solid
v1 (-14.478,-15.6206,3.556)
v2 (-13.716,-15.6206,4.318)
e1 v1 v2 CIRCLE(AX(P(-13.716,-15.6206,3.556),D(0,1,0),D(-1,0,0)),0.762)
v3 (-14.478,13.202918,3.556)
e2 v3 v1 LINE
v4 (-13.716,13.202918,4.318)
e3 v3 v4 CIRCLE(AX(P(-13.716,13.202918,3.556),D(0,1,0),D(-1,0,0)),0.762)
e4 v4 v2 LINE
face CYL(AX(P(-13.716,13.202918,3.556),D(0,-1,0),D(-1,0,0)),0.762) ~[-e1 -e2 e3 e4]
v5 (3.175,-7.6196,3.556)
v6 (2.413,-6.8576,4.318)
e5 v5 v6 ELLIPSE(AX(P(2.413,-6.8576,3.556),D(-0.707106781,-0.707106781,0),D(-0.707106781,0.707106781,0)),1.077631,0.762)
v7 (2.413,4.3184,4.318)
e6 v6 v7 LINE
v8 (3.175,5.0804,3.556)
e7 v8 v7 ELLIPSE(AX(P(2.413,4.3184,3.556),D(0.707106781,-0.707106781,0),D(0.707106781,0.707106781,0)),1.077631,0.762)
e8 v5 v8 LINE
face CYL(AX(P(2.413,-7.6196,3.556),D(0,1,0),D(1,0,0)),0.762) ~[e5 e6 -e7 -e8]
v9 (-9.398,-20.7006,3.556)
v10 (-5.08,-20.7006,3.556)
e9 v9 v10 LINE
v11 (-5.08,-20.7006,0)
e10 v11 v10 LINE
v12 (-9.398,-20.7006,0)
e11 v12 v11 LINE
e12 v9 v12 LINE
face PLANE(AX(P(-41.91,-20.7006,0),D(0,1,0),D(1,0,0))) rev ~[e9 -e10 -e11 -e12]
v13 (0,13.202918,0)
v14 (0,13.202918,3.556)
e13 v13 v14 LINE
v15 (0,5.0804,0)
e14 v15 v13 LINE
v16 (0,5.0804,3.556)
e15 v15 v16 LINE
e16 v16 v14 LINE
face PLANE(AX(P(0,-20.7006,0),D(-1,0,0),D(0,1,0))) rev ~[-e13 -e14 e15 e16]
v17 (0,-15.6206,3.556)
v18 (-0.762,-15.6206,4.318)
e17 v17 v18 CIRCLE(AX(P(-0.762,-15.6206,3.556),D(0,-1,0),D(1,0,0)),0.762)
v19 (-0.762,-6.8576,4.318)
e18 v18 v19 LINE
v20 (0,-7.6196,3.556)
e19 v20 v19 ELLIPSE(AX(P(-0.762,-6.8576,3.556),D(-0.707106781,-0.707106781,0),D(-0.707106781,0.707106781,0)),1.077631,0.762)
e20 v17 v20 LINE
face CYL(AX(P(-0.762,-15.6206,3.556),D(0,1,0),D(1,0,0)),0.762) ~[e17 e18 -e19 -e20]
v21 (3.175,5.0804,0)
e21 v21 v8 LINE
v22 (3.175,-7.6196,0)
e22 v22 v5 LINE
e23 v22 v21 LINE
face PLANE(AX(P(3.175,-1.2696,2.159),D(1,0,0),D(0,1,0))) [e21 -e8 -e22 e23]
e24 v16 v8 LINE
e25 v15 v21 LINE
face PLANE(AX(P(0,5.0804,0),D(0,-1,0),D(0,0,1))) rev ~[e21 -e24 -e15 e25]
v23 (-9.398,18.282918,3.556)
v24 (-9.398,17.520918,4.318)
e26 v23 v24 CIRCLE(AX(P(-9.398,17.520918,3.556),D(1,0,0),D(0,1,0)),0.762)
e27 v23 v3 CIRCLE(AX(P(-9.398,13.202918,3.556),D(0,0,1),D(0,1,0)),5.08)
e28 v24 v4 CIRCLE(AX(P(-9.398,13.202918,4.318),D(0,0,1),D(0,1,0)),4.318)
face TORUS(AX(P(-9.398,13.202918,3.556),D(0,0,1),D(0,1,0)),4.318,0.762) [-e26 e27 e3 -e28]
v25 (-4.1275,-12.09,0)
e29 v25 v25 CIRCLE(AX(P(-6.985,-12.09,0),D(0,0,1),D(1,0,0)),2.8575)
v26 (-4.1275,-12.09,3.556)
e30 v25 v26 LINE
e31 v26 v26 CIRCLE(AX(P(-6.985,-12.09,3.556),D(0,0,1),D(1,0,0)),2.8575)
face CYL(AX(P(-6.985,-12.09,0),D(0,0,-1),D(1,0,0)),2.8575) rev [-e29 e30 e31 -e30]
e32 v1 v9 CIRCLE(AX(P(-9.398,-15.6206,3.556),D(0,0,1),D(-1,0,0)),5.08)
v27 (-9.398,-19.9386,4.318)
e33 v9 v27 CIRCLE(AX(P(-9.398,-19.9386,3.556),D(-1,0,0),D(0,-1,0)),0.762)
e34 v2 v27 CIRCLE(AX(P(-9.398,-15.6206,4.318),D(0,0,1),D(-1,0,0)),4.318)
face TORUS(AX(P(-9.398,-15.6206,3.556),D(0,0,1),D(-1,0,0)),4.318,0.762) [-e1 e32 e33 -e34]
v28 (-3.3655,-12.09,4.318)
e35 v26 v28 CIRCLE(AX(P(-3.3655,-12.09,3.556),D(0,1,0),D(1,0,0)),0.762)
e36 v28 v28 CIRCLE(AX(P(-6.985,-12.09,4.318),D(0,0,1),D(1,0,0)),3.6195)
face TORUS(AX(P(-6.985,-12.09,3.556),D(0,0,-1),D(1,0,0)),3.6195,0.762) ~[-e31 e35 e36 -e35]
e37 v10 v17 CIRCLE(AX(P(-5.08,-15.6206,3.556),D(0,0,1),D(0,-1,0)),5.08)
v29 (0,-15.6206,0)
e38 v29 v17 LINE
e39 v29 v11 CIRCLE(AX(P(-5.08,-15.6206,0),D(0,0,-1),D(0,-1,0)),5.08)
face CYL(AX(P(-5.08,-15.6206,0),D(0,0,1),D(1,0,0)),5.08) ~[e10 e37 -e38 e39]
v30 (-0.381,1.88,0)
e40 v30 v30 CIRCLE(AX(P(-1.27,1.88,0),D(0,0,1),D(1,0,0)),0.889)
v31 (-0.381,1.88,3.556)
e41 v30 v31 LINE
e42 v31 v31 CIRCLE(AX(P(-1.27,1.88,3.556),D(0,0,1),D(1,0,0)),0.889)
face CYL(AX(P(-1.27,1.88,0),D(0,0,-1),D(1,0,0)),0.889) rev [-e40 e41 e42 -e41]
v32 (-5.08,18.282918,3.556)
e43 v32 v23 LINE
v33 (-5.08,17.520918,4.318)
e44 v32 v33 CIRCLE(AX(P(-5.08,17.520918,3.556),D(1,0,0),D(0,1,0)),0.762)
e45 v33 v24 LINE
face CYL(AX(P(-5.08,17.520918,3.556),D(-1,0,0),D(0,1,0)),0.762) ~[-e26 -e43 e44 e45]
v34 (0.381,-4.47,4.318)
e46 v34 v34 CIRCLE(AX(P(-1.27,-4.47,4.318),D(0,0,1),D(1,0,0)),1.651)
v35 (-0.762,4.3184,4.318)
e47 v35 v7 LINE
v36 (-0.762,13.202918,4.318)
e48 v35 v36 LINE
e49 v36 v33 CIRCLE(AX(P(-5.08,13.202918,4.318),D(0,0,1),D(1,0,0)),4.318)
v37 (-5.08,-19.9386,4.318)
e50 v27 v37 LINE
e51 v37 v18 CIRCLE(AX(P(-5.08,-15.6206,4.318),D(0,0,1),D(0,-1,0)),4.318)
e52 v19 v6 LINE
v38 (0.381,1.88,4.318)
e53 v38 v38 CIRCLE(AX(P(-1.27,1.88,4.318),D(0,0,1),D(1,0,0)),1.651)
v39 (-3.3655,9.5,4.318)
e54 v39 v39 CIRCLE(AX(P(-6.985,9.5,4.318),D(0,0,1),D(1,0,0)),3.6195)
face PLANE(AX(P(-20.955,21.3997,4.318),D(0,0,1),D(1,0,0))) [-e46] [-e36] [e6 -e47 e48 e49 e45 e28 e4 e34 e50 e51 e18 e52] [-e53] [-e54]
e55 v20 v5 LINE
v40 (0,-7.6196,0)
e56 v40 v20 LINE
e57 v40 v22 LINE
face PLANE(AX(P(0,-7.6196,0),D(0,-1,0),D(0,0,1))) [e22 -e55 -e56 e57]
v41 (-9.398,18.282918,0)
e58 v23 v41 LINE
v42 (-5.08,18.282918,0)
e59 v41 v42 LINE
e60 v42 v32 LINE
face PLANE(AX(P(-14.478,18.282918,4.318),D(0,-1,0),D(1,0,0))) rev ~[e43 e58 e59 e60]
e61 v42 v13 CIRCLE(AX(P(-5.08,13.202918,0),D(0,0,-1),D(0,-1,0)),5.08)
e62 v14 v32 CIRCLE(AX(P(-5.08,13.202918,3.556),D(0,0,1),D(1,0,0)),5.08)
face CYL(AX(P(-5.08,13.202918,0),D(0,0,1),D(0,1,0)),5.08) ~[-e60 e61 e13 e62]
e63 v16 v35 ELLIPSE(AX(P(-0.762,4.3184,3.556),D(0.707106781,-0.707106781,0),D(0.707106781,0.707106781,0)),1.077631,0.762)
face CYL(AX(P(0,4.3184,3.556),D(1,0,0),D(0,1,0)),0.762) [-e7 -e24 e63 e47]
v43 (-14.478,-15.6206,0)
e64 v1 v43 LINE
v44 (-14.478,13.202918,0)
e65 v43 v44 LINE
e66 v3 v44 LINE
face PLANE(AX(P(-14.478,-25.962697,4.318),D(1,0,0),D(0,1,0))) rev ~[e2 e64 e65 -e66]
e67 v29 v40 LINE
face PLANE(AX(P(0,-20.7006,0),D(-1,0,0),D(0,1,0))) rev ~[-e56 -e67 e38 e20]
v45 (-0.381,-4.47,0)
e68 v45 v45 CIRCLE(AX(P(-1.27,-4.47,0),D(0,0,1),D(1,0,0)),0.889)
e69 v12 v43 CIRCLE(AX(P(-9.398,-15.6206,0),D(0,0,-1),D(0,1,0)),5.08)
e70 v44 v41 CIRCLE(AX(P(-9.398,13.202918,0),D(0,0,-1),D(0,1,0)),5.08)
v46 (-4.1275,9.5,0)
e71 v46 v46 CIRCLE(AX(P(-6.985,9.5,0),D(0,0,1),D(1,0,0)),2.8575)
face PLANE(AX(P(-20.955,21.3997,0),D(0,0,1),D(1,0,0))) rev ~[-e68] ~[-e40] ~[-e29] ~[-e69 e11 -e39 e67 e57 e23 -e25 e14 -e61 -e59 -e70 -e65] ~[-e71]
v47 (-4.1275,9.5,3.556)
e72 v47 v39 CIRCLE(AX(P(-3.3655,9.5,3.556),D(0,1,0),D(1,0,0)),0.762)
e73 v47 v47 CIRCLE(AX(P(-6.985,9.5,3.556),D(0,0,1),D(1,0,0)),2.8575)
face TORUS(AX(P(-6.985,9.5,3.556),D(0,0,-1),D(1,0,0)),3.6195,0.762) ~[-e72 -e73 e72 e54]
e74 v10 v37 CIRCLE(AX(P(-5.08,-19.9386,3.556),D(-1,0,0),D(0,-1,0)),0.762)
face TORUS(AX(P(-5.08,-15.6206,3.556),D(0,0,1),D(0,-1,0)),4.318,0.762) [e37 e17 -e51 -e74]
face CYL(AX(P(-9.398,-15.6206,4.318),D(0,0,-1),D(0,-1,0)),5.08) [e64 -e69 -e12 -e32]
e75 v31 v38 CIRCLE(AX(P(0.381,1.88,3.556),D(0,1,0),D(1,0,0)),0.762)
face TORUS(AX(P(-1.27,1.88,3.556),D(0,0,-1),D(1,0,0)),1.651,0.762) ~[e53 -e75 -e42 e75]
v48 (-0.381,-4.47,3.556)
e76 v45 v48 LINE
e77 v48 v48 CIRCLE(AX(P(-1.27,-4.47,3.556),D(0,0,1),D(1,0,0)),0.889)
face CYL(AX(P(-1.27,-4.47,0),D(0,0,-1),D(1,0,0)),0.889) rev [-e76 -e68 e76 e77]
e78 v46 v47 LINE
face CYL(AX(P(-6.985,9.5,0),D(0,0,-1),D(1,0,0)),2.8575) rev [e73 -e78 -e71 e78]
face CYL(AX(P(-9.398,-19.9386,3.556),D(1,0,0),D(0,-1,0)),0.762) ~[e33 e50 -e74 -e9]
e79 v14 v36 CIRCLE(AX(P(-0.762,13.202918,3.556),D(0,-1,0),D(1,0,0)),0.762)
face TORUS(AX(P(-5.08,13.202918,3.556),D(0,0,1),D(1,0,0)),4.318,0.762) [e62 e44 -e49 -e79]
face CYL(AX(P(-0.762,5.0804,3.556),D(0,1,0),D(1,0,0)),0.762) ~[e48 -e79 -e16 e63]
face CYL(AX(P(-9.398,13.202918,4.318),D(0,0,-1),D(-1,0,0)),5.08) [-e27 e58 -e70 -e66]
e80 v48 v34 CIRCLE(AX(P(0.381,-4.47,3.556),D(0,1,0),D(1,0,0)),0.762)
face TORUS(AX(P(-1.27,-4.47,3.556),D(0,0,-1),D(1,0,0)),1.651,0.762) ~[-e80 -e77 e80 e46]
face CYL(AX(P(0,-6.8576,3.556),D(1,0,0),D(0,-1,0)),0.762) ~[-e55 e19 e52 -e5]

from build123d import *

# Parameters (mm, degrees)
F0_R     = 2.8575
F0_R_2   = 0.889
F0_R_3   = 1.905
F0_R_4   = 11.7475
F1_DEPTH = 4.318
F2_W     = 12.7
F2_H     = 4.318
F3_DEPTH = 3.175
F4_R     = 5.08
F6_DEPTH = 25.4
F7_R     = 5.08
F8_R     = 0.762


# Not quite as in the source:
# - a feature names something its author has since deleted; it is built from what else it names


with BuildPart() as f1:
    # F0 (on Top) → F1 (new body)
    with BuildSketch(Plane.XY):
        Polygon((0, -20.7006), (0, 0), (0, 63.5), (-41.91, 63.5), (-41.91, 19), (-41.91, 0), (-41.91, -20.7006), align=None)
        with Locations((-34.925, -12.09)):
            Circle(F0_R, mode=Mode.SUBTRACT)
        with Locations((-34.925, 9.5)):
            Circle(F0_R, mode=Mode.SUBTRACT)
        with Locations((-6.985, -12.09)):
            Circle(F0_R, mode=Mode.SUBTRACT)
        with Locations((-1.27, -4.47)):
            Circle(F0_R_2, mode=Mode.SUBTRACT)
        with Locations((-6.985, 9.5)):
            Circle(F0_R, mode=Mode.SUBTRACT)
        with Locations((-1.27, 1.88)):
            Circle(F0_R_2, mode=Mode.SUBTRACT)
        with Locations((-36.83, 27.178)):
            Circle(F0_R_3, mode=Mode.SUBTRACT)
        with Locations((-36.83, 58.293)):
            Circle(F0_R_3, mode=Mode.SUBTRACT)
        with Locations((-5.08, 27.178)):
            Circle(F0_R_3, mode=Mode.SUBTRACT)
        with Locations((-20.955, 42.7355)):
            Circle(F0_R_4, mode=Mode.SUBTRACT)
        with Locations((-5.08, 58.293)):
            Circle(F0_R_3, mode=Mode.SUBTRACT)
    extrude(amount=F1_DEPTH)

    # F2 (on face) → F3 (join)
    with BuildSketch(Plane.YZ):
        with Locations((-1.2696, 2.159)):
            Rectangle(F2_W, F2_H)
    extrude(amount=F3_DEPTH)

    # F4
    f4_edges = [f1.edges().sort_by_distance(p)[0] for p in [
        (0, 63.5, 2.159),
        (-41.91, 63.5, 2.159),
        (0, -20.7006, 2.159),
        (-41.91, -20.7006, 2.159),
    ]]
    fillet(f4_edges, radius=F4_R)

    # F5 (on face) → F6 (cut)
    with BuildSketch(Plane.XY.offset(4.318)):
        Polygon((-51.067360534, -23.478101939), (-14.478, -25.962697342), (-14.478, 18.2829182773), (4.9410860353, 18.2829182773), (4.9410860353, 69.2363290038), (-51.067360534, 69.2363290038), align=None)
    extrude(amount=-F6_DEPTH, mode=Mode.SUBTRACT)

    # F7
    f7_edges = [f1.edges().sort_by_distance(p)[0] for p in [
        (-14.478, -20.7006, 2.159),
        (-14.478, 18.282918, 2.159),
        (0, 18.282918, 2.159),
    ]]
    fillet(f7_edges, radius=F7_R)

    # F8
    f8_edges = [f1.edges().sort_by_distance(p)[0] for p in [
        (0, 9.141659, 4.318),
        (-1.487898, 16.795021, 4.318),
        (1.5875, 5.0804, 4.318),
        (-7.239, 18.282918, 4.318),
        (3.175, -1.2696, 4.318),
        (-12.990102, 16.795021, 4.318),
        (1.5875, -7.6196, 4.318),
        (-14.478, -1.208841, 4.318),
        (0, -11.6201, 4.318),
        (-12.990102, -19.212702, 4.318),
        (-1.487898, -19.212702, 4.318),
        (-7.239, -20.7006, 4.318),
        (-9.8425, -12.09, 4.318),
        (-2.159, -4.47, 4.318),
        (-2.159, 1.88, 4.318),
        (-9.8425, 9.5, 4.318),
    ]]
    fillet(f8_edges, radius=F8_R)


solid = f1.part
